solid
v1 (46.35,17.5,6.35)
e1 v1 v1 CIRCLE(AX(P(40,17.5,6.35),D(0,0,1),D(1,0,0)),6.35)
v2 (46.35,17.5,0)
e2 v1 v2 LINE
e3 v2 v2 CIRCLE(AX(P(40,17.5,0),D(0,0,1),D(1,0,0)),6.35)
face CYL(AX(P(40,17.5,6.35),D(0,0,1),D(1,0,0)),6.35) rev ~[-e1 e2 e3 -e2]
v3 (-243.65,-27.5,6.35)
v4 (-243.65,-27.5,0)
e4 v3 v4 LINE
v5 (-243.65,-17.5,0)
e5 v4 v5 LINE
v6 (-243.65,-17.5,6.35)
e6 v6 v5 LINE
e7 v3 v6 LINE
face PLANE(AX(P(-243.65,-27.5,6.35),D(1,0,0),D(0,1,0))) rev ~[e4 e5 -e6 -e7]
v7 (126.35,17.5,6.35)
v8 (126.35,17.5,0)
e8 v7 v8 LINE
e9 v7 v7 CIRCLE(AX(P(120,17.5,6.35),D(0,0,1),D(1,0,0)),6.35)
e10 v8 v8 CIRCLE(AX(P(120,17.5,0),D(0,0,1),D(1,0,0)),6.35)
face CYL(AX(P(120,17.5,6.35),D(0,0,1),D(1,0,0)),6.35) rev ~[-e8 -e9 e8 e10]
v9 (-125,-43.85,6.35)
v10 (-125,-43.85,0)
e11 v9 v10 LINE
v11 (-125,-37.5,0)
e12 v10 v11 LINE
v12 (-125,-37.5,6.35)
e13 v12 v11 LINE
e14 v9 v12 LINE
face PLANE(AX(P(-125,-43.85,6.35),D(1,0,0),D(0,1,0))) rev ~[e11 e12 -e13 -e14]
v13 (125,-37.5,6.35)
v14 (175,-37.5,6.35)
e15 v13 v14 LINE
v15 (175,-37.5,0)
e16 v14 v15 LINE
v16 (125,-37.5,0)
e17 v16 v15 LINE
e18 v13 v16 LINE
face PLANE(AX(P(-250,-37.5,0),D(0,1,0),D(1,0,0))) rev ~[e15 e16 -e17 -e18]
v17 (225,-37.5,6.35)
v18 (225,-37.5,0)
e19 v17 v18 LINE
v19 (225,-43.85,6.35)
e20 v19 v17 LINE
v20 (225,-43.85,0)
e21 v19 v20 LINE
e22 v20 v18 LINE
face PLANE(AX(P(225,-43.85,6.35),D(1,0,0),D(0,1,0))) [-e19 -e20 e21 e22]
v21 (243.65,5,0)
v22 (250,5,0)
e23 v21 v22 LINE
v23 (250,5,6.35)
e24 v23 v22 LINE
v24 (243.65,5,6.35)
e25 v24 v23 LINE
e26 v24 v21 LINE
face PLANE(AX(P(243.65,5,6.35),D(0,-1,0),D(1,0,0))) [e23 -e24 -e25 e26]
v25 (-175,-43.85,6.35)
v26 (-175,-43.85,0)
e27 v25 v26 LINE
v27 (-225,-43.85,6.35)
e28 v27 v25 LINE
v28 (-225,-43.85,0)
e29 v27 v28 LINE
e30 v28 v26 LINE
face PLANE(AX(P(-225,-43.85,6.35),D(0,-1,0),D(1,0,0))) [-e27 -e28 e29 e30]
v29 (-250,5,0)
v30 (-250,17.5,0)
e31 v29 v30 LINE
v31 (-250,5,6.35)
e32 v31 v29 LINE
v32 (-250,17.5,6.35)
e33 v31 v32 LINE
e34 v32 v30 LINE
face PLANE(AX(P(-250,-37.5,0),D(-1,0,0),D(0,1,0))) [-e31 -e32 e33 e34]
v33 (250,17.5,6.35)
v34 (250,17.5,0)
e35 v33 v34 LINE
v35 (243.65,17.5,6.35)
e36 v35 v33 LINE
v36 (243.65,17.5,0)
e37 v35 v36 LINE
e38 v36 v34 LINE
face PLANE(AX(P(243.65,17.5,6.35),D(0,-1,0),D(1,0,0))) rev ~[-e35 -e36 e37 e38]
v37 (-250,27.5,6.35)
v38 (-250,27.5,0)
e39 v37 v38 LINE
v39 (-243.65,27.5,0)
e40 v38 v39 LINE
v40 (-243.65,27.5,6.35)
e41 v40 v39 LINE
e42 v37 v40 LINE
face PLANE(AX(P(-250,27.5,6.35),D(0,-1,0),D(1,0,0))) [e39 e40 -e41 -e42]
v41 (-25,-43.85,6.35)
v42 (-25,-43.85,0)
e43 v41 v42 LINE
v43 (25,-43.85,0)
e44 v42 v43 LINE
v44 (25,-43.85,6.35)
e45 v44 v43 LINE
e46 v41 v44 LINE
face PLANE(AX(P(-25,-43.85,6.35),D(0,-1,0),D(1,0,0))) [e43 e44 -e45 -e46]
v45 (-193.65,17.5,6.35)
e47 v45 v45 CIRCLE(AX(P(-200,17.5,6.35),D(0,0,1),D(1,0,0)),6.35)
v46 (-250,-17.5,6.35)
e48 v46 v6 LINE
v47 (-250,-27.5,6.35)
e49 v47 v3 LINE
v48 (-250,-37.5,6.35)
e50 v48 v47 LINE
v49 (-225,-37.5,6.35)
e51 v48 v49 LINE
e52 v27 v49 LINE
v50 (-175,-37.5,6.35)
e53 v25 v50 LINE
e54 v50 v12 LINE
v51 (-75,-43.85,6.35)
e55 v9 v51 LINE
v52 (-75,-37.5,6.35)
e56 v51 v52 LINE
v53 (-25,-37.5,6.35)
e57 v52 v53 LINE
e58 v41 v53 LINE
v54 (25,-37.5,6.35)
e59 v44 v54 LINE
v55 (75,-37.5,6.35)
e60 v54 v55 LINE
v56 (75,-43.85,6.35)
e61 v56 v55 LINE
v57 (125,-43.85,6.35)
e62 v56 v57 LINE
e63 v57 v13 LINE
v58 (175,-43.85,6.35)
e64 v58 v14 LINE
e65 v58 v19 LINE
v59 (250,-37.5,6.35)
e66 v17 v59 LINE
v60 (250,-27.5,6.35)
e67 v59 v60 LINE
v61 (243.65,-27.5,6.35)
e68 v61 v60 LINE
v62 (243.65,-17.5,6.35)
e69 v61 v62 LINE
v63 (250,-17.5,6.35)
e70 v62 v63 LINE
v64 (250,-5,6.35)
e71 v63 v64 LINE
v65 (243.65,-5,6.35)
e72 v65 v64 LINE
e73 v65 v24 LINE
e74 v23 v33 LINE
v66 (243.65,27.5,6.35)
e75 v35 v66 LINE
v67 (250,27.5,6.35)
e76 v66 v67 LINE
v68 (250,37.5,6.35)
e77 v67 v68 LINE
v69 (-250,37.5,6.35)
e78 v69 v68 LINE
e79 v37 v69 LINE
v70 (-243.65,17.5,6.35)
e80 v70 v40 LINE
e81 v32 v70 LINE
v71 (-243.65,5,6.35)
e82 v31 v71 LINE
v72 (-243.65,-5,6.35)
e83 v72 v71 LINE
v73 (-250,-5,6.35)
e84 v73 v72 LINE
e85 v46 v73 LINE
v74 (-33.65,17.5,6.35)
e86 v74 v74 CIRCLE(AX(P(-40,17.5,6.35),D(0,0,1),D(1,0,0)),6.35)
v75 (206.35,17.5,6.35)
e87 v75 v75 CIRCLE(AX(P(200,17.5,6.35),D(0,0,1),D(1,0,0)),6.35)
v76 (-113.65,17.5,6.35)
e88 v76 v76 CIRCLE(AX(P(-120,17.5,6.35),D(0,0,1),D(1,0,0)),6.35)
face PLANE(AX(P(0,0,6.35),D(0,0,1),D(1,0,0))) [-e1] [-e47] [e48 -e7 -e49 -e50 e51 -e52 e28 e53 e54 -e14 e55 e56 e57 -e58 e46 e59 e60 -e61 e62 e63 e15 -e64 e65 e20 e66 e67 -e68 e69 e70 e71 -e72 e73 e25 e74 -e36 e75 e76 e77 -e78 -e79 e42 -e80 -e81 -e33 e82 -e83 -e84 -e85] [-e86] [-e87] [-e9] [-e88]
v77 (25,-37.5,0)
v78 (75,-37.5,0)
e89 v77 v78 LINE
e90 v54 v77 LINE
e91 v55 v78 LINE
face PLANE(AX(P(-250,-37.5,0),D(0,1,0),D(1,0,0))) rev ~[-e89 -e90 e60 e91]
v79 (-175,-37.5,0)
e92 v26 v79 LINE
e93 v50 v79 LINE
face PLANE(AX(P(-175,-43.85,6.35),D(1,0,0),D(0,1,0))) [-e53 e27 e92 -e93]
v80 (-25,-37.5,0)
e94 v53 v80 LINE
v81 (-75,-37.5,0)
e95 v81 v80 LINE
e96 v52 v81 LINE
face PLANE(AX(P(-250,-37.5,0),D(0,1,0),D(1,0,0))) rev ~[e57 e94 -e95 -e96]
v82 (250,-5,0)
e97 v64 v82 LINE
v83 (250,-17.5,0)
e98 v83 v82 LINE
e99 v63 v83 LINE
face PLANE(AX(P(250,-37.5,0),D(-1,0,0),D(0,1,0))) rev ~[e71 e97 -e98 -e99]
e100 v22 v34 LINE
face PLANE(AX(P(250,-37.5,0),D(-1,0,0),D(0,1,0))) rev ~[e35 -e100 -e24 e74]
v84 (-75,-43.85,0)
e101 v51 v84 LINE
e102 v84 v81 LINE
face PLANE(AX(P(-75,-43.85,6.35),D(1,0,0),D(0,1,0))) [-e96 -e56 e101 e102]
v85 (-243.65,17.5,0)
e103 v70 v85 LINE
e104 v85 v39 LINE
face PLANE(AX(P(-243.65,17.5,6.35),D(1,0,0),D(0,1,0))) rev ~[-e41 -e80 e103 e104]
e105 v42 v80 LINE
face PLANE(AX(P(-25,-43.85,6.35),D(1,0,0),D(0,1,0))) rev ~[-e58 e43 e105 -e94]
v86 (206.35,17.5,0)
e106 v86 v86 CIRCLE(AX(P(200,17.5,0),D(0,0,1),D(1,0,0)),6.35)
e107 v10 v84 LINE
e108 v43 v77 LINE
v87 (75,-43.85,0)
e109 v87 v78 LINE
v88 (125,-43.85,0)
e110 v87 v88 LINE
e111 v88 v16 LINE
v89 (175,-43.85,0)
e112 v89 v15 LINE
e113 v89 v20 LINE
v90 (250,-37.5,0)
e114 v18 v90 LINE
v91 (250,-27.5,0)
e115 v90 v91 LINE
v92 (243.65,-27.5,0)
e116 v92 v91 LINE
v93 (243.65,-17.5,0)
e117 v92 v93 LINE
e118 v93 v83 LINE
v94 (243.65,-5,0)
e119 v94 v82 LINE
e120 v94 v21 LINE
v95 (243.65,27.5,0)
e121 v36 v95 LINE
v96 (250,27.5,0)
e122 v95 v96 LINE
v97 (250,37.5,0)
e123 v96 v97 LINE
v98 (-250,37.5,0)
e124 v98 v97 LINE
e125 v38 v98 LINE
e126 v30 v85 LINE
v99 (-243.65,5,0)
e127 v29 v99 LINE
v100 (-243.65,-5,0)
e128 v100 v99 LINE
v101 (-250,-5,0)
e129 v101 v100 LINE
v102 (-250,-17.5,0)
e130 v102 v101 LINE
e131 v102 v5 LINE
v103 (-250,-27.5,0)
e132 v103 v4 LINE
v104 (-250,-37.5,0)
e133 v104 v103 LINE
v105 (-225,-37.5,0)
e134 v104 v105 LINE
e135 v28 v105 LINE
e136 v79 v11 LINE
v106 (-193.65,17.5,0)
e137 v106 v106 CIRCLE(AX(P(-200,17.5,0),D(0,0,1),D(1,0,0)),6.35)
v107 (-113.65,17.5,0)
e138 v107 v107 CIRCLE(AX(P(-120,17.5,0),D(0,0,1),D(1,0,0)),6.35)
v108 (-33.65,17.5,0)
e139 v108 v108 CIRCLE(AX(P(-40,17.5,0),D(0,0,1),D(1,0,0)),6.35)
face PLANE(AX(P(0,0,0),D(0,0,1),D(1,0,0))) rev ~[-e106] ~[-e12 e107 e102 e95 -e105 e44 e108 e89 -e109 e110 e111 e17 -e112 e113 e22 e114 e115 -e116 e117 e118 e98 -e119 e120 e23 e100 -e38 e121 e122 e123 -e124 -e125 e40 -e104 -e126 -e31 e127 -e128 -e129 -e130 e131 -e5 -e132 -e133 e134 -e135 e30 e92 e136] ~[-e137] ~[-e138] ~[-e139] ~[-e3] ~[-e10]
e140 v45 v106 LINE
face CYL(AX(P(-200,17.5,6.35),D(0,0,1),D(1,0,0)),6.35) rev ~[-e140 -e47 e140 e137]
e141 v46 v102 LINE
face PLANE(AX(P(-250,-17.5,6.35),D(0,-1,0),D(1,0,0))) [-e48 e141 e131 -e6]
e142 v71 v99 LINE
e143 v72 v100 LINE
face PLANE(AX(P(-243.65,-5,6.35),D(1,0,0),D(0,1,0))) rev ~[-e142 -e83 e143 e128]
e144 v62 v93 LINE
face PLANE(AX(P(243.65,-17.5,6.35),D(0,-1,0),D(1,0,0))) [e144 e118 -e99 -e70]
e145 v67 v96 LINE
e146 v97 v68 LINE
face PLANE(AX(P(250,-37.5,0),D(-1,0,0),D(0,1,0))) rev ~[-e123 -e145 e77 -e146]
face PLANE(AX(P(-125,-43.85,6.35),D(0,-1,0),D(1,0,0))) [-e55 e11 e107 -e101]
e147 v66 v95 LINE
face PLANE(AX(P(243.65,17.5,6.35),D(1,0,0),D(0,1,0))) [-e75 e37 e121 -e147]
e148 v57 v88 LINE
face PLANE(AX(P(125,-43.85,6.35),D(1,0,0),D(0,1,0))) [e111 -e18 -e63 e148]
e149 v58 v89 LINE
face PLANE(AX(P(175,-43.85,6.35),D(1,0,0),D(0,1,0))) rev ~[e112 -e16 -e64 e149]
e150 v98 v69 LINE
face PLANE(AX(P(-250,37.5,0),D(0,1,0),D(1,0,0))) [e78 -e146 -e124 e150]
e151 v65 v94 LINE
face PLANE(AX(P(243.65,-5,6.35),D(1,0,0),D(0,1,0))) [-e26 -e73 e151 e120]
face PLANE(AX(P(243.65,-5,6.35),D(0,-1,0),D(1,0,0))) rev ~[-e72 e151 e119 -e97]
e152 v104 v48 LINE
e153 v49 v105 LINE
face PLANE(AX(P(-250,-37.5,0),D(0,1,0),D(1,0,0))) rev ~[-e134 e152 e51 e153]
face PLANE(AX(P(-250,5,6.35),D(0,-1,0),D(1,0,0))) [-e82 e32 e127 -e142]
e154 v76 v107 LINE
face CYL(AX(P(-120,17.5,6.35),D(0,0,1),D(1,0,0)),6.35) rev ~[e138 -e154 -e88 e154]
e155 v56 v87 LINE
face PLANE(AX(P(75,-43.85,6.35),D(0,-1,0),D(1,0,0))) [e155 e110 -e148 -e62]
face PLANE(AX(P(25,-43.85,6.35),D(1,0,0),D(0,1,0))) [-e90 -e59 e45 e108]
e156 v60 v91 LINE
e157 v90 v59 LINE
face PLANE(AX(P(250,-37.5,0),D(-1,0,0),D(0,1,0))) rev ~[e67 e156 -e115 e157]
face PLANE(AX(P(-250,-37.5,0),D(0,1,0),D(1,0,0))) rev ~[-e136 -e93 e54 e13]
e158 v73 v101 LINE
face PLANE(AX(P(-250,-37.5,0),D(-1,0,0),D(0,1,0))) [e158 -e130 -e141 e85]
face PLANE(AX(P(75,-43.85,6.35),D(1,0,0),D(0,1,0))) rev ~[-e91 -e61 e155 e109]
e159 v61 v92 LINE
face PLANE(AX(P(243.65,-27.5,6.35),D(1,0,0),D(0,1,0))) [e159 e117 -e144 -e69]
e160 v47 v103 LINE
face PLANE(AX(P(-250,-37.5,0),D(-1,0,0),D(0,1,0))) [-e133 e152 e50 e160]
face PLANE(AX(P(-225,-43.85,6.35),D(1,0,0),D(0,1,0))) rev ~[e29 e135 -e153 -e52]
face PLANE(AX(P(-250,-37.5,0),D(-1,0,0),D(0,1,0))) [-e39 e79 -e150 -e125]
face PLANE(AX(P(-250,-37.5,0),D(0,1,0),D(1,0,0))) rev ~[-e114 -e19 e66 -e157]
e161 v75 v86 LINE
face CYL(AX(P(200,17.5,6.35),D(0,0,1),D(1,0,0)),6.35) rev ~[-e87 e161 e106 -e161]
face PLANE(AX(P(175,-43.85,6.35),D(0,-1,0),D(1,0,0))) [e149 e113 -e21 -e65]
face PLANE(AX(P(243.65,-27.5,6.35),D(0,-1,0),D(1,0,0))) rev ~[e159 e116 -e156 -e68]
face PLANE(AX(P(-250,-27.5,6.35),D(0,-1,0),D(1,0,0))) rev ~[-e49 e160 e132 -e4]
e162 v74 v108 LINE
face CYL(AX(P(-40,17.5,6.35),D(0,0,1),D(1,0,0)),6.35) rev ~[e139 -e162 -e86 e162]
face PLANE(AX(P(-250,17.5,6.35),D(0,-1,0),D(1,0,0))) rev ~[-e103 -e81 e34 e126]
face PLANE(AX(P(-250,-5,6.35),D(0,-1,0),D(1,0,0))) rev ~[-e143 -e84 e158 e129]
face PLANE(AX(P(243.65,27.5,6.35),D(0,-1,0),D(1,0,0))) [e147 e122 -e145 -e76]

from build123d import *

# Parameters (mm, degrees)
F0_W     = 500
F0_H     = 75
F1_DEPTH = 6.35
F2_W     = 50
F2_H     = 6.35
F3_DEPTH = 6.35
F4_W     = 6.35
F4_H     = 10
F5_DEPTH = 6.351
F6_R     = 6.35
F7_DEPTH = 25


# Not quite as in the source:
# - a length typed as a fraction of an inch, garbled in the dataset ("3 / 203.2 mm" for 3/8 in), is restored


with BuildPart() as f1:
    # F0 (on Top) → F1 (new body)
    with BuildSketch(Plane.XY):
        Rectangle(F0_W, F0_H)
    extrude(amount=F1_DEPTH)

    # F2 (on face) → F3 (join, through all)
    with BuildSketch(Plane.XY.offset(6.35)):
        with Locations((-200, -40.675)):
            Rectangle(F2_W, F2_H)
        with Locations((-100, -40.675)):
            Rectangle(F2_W, F2_H)
        with Locations((0, -40.675)):
            Rectangle(F2_W, F2_H)
        with Locations((100, -40.675)):
            Rectangle(F2_W, F2_H)
        with Locations((200, -40.675)):
            Rectangle(F2_W, F2_H)
    extrude(amount=-F3_DEPTH)

    # F4 (on face) → F5 (cut, through all)
    with BuildSketch(Plane.XY.offset(6.35)):
        with Locations((246.825, 22.5)):
            Rectangle(F4_W, F4_H)
        with Locations((246.825, 0)):
            Rectangle(F4_W, F4_H)
        with Locations((246.825, -22.5)):
            Rectangle(F4_W, F4_H)
        with Locations((-246.825, 22.5)):
            Rectangle(F4_W, F4_H)
        with Locations((-246.825, 0)):
            Rectangle(F4_W, F4_H)
        with Locations((-246.825, -22.5)):
            Rectangle(F4_W, F4_H)
    extrude(amount=-F5_DEPTH, mode=Mode.SUBTRACT)

    # F6 (on face) → F7 (cut)
    with BuildSketch(Plane.XY.offset(6.35)):
        with Locations((-200, 17.5)):
            Circle(F6_R)
        with Locations((-120, 17.5)):
            Circle(F6_R)
        with Locations((-40, 17.5)):
            Circle(F6_R)
        with Locations((40, 17.5)):
            Circle(F6_R)
        with Locations((120, 17.5)):
            Circle(F6_R)
        with Locations((200, 17.5)):
            Circle(F6_R)
    extrude(amount=-F7_DEPTH, mode=Mode.SUBTRACT)


solid = f1.part
